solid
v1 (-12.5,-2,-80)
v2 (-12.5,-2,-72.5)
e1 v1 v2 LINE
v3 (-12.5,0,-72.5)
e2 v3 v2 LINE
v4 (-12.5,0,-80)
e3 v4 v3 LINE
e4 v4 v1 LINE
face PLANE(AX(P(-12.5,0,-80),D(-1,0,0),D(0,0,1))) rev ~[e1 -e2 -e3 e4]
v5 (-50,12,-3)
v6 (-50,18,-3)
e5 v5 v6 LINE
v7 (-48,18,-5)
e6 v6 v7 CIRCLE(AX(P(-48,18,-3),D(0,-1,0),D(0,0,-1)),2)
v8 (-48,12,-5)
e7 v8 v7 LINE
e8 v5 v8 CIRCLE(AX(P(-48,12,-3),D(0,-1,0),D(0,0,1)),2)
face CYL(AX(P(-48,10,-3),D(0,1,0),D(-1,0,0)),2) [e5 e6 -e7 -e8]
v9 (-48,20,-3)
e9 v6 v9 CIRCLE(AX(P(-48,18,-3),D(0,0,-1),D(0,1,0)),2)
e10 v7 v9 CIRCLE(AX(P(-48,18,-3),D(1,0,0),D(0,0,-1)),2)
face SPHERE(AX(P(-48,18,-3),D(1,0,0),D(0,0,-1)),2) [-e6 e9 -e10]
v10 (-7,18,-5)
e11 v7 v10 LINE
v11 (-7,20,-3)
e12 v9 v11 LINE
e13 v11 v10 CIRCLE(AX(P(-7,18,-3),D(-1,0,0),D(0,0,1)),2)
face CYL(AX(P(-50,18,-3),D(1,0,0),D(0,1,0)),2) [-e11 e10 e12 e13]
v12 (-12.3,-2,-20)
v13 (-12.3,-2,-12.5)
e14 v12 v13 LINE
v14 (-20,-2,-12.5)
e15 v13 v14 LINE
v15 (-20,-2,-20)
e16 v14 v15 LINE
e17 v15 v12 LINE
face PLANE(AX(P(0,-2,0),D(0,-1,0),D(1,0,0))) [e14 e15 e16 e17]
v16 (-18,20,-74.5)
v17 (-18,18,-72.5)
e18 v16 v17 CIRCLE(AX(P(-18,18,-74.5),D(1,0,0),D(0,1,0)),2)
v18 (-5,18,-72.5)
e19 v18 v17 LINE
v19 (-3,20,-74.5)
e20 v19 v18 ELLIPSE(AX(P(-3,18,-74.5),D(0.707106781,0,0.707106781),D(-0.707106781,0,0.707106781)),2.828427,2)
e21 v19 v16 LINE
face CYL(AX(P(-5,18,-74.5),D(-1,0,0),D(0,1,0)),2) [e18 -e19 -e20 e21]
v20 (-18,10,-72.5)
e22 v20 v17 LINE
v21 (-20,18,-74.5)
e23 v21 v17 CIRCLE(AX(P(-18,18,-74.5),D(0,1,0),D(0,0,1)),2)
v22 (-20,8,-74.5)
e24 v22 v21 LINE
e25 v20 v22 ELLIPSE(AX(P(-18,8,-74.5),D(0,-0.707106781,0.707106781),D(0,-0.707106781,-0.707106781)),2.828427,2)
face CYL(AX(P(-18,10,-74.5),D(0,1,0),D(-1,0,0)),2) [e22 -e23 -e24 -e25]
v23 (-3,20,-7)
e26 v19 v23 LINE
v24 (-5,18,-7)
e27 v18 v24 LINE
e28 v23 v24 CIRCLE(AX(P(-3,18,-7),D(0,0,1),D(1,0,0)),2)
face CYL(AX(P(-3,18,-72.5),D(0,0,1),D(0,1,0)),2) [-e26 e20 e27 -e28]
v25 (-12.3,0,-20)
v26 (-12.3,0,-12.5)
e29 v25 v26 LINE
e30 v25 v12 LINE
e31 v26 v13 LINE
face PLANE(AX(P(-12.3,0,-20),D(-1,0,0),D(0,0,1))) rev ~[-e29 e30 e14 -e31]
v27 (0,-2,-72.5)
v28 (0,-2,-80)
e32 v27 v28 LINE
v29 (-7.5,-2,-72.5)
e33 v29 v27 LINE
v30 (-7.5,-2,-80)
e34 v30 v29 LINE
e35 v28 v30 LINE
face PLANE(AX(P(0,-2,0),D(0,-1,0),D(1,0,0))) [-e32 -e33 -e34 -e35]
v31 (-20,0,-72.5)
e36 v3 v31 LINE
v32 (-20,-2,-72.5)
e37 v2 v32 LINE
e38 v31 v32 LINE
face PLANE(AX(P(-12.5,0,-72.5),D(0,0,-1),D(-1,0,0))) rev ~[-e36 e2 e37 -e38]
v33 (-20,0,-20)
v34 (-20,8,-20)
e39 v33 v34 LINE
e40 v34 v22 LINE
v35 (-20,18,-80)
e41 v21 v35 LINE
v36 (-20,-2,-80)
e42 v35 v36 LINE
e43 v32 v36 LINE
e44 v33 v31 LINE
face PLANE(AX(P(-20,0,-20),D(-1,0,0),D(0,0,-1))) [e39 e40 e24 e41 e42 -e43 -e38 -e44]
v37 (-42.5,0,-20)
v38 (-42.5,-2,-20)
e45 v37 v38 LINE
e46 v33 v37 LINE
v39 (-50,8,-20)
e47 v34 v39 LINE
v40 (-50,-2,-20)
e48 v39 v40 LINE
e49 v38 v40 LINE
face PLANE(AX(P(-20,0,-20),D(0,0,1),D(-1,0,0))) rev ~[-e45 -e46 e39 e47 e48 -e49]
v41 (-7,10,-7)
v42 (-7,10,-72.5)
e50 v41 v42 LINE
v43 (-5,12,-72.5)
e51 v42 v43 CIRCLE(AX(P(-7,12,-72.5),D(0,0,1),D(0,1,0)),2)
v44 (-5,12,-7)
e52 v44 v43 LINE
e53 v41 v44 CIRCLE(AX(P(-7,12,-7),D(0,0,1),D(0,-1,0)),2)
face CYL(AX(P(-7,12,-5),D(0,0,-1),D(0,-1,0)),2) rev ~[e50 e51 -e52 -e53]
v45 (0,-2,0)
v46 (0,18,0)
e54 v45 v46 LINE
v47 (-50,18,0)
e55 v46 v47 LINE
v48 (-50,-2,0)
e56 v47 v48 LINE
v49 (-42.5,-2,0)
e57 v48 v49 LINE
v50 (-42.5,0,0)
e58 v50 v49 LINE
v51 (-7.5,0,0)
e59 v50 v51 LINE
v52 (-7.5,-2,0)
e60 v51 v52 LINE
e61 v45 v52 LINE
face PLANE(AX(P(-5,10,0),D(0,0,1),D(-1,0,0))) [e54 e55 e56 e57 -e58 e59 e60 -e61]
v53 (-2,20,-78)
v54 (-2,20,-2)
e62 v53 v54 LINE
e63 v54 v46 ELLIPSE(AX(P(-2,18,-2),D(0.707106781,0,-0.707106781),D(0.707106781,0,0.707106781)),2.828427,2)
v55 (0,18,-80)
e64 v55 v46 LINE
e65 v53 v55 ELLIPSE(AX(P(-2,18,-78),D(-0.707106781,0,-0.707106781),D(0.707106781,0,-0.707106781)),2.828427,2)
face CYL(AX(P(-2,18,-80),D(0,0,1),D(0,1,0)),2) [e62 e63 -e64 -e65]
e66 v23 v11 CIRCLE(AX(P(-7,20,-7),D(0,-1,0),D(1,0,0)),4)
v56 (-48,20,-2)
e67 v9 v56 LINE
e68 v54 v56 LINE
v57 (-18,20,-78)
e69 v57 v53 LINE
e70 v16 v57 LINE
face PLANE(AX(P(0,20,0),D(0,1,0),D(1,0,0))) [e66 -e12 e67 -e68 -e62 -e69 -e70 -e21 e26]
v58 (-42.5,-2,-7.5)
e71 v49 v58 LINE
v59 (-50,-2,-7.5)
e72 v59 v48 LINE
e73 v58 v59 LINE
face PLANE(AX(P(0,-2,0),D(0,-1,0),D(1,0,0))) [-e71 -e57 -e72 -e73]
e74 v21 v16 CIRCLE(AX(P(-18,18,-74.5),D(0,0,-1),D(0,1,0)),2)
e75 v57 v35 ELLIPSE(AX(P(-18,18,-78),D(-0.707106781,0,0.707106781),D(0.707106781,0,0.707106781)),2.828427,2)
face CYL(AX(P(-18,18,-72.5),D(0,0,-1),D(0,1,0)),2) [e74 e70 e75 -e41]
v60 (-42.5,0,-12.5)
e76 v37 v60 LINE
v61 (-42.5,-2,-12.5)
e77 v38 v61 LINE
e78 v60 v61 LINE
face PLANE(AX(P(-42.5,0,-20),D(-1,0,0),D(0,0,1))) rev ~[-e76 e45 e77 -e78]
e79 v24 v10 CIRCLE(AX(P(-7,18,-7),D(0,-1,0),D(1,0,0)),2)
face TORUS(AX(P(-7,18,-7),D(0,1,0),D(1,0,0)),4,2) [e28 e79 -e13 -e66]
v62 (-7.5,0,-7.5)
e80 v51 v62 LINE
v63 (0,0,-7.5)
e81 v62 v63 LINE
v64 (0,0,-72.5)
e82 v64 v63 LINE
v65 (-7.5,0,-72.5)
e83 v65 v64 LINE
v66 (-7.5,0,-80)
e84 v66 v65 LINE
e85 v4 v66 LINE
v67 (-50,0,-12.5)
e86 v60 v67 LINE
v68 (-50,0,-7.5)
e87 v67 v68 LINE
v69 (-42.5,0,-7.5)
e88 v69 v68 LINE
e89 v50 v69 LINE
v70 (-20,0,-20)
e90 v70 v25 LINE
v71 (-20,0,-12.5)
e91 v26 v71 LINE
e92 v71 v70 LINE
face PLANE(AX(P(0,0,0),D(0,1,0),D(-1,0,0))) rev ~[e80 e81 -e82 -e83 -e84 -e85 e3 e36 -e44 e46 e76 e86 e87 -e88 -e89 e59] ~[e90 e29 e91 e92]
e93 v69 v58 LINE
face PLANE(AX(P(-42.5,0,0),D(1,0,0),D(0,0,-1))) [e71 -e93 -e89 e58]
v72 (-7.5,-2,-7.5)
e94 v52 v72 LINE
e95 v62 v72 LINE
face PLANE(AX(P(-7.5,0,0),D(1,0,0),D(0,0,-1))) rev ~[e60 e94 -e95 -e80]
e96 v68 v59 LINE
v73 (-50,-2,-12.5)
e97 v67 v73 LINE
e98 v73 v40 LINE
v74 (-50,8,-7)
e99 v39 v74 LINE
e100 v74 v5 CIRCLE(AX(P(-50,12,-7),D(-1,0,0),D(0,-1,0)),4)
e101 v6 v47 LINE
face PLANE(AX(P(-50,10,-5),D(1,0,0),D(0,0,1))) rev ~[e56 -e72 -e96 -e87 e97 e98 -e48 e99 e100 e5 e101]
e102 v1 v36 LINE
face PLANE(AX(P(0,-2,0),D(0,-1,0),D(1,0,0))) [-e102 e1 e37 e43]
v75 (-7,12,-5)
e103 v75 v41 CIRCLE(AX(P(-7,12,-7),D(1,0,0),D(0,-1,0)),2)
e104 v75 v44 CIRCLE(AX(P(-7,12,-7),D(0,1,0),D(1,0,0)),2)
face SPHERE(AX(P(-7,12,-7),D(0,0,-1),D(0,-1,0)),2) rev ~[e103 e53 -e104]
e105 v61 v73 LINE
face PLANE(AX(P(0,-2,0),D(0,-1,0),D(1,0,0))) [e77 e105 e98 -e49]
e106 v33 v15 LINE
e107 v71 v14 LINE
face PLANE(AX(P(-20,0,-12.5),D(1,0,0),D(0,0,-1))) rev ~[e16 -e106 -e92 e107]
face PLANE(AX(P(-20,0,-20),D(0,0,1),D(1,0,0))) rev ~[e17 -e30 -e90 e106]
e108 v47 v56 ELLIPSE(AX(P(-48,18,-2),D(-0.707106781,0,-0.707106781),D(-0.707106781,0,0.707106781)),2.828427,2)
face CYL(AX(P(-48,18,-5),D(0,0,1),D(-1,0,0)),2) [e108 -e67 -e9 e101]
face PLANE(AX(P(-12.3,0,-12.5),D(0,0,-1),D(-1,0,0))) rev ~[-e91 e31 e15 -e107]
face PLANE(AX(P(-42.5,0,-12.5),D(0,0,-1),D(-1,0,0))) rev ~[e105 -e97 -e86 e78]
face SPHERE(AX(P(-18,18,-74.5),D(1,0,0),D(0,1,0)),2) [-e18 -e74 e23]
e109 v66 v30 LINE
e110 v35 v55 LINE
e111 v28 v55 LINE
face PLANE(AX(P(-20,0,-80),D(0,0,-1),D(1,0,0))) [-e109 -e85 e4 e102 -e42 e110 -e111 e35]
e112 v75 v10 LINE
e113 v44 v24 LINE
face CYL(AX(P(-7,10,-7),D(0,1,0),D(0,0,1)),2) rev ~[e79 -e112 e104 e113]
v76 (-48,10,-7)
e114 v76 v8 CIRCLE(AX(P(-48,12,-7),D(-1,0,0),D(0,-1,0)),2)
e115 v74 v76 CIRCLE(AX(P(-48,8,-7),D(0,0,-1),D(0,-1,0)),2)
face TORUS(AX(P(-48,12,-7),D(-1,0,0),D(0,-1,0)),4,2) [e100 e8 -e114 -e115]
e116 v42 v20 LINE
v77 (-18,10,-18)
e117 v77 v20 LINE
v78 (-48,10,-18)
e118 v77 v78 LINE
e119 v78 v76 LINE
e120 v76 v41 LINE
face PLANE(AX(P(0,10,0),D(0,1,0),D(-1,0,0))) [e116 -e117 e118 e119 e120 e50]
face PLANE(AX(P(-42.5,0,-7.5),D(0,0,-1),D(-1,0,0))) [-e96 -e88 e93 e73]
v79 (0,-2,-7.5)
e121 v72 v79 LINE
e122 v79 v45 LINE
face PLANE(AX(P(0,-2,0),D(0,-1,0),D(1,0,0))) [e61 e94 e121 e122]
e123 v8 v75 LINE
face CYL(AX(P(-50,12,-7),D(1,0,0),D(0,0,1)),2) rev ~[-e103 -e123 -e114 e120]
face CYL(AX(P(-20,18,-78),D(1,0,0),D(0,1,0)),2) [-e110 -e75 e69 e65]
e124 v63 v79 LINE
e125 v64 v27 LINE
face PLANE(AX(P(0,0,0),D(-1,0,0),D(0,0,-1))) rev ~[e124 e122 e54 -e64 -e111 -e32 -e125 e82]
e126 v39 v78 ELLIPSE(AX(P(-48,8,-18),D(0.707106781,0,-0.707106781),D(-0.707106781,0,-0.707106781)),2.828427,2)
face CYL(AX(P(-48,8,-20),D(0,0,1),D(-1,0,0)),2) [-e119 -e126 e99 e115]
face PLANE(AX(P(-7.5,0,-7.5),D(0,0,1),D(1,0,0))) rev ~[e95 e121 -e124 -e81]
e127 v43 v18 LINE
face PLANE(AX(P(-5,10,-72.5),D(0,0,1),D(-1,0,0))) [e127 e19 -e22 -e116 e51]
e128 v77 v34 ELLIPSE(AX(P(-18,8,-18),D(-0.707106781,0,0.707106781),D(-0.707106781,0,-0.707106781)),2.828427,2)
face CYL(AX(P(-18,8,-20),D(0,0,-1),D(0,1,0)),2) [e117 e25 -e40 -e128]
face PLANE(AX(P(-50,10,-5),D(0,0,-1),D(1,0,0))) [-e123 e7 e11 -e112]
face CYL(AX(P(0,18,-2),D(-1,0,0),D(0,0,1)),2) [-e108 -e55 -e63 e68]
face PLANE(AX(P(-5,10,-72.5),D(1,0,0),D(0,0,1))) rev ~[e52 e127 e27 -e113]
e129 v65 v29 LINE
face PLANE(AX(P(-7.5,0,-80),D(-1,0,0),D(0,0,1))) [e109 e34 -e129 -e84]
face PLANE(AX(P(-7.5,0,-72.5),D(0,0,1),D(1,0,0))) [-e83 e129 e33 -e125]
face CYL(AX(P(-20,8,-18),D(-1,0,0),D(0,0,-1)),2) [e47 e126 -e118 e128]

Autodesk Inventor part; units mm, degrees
ref_plane "YZ Plane" through (0, 0, 0) normal (1, 0, 0) x (0, 1, 0)
ref_plane "XZ Plane" through (0, 0, 0) normal (0, 1, 0) x (-1, 0, 0)
ref_plane "XY Plane" through (0, 0, 0) normal (0, 0, 1) x (1, 0, 0)
sketch "Sketch1" plane through (0, 0, 0) normal (0, 1, 0) x (-1, 0, 0)
  line L0 (50, 0) -> (0, 0)
  line L1 (0, 0) -> (0, -20)
  line L2 (0, -20) -> (50, -20)
  line L3 (50, -20) -> (50, 0)
  line L4 (0, 0) -> (20, 0)
  line L5 (20, 0) -> (20, -80)
  line L6 (20, -80) -> (0, -80)
  line L7 (0, -80) -> (0, 0)
  point P0 (0, 0)
  point P1 (20, -20)
  dimension "d0" = 50
  dimension "d1" = 20
  dimension "d2" = 80
  dimension "d3" = 20
  dimension "d4" = 0
  dimension "d5" = 0
extrude "Extrusion1" add sketch "Sketch1" along normal blind 10
sketch "Sketch3" plane through (0, 10, 0) normal (0, 1, 0) x (1, 0, 0)
  line L0 (0, 80) -> (-20, 80) projected
  line L1 (-20, 80) -> (0, 80)
  line L2 (0, 80) -> (0, 72.5)
  line L3 (0, 72.5) -> (-20, 72.5)
  line L4 (-20, 72.5) -> (-20, 80)
  line L5 (0, 0) -> (0, 80) projected
  line L6 (0, 80) -> (-5, 80)
  line L7 (-5, 80) -> (-5, 0)
  line L8 (-5, 0) -> (0, 0)
  line L9 (0, 0) -> (0, 80)
  line L10 (-50, 20) -> (-50, 0) projected
  line L11 (0, 0) -> (-50, 0)
  line L12 (0, 10) -> (0, 0)
  line L13 (-50, 0) -> (0, 0) projected
  line L14 (0, 0) -> (-50, 0)
  line L15 (-50, 0) -> (-50, 5)
  line L16 (-50, 5) -> (0, 5)
  line L17 (0, 5) -> (0, 0)
  point P0 (-50, 10)
  point P1 (-5, 72.5)
  point P2 (-5, 5)
  point P3 (-5, 0)
  dimension "d8" = 20
  dimension "d9" = 7.5
  dimension "d10" = 5
  dimension "d11" = 80
  dimension "d14" = 50
  dimension "d15" = 5
extrude "Extrusion2" add sketch "Sketch3" along normal blind 10 contours L2 L3 L7 L0 | L7 L3 L4 L0 | L5 L16 L7 L3 | L16 L5 L8 L7
extrude "Extrusion3" add sketch "Sketch3" along normal blind 10 contours L7 L11 L10 L16
fillet "Fillet1" radius 2 16 edges at (-5, 20, -38.75) (-5, 10, -38.75) (-27.5, 20, -5) (-27.5, 10, -5) (-5, 15, -5) (-20, 10, -46.25) (-35, 10, -20) (-12.5, 20, -72.5) (-10, 20, -80) (-20, 20, -76.25) (-20, 15, -72.5) (-50, 10, -12.5) (-50, 15, -5) (-50, 20, -2.5) (0, 20, -40) (-25, 20, 0)
sketch "Sketch4" plane through (0, 0, 0) normal (0, -1, 0) x (1, 0, 0)
  line L0 (0, 0) -> (-7.5, 0)
  line L1 (-7.5, 0) -> (-7.5, -7.5)
  line L2 (-7.5, -7.5) -> (0, -7.5)
  line L3 (0, -7.5) -> (0, 0)
  line L4 (-20, -20) -> (-50, -20) projected
  line L5 (-50, -20) -> (-42.5, -20)
  line L6 (-42.5, -20) -> (-42.5, -12.5)
  line L7 (-42.5, -12.5) -> (-50, -12.5)
  line L8 (-50, -12.5) -> (-50, -20)
  line L9 (-50, 0) -> (0, 0) projected
  line L10 (-50, 0) -> (-42.5, 0)
  line L11 (-42.5, 0) -> (-42.5, -7.5)
  line L12 (-42.5, -7.5) -> (-50, -7.5)
  line L13 (-50, -7.5) -> (-50, 0)
  line L14 (-18, -18) -> (-20, -20) projected
  line L15 (-20, -20) -> (-12.3, -20)
  line L16 (-12.3, -20) -> (-12.3, -12.5)
  line L17 (-12.3, -12.5) -> (-20, -12.5)
  line L18 (-20, -12.5) -> (-20, -20)
  line L19 (0, -80) -> (-20, -80) projected
  line L20 (-20, -80) -> (-12.5, -80)
  line L21 (-12.5, -80) -> (-12.5, -72.5)
  line L22 (-12.5, -72.5) -> (-20, -72.5)
  line L23 (-20, -72.5) -> (-20, -80)
  line L24 (0, 0) -> (0, -80) projected
  line L25 (0, -80) -> (-7.5, -80)
  line L26 (-7.5, -80) -> (-7.5, -72.5)
  line L27 (-7.5, -72.5) -> (0, -72.5)
  line L28 (0, -72.5) -> (0, -80)
  point P0 (0, -72.5)
  dimension "d19" = 7.5
  dimension "d20" = 7.5
  dimension "d21" = 7.5
  dimension "d22" = 7.5
  dimension "d23" = 7.5
  dimension "d24" = 7.5
  dimension "d25" = 7.7
  dimension "d26" = 7.5
  dimension "d27" = 7.5
  dimension "d28" = 7.5
  dimension "d29" = 7.5
  dimension "d30" = 7.5
extrude "Extrusion4" add sketch "Sketch4" along normal blind 2
properties part number "couch"
